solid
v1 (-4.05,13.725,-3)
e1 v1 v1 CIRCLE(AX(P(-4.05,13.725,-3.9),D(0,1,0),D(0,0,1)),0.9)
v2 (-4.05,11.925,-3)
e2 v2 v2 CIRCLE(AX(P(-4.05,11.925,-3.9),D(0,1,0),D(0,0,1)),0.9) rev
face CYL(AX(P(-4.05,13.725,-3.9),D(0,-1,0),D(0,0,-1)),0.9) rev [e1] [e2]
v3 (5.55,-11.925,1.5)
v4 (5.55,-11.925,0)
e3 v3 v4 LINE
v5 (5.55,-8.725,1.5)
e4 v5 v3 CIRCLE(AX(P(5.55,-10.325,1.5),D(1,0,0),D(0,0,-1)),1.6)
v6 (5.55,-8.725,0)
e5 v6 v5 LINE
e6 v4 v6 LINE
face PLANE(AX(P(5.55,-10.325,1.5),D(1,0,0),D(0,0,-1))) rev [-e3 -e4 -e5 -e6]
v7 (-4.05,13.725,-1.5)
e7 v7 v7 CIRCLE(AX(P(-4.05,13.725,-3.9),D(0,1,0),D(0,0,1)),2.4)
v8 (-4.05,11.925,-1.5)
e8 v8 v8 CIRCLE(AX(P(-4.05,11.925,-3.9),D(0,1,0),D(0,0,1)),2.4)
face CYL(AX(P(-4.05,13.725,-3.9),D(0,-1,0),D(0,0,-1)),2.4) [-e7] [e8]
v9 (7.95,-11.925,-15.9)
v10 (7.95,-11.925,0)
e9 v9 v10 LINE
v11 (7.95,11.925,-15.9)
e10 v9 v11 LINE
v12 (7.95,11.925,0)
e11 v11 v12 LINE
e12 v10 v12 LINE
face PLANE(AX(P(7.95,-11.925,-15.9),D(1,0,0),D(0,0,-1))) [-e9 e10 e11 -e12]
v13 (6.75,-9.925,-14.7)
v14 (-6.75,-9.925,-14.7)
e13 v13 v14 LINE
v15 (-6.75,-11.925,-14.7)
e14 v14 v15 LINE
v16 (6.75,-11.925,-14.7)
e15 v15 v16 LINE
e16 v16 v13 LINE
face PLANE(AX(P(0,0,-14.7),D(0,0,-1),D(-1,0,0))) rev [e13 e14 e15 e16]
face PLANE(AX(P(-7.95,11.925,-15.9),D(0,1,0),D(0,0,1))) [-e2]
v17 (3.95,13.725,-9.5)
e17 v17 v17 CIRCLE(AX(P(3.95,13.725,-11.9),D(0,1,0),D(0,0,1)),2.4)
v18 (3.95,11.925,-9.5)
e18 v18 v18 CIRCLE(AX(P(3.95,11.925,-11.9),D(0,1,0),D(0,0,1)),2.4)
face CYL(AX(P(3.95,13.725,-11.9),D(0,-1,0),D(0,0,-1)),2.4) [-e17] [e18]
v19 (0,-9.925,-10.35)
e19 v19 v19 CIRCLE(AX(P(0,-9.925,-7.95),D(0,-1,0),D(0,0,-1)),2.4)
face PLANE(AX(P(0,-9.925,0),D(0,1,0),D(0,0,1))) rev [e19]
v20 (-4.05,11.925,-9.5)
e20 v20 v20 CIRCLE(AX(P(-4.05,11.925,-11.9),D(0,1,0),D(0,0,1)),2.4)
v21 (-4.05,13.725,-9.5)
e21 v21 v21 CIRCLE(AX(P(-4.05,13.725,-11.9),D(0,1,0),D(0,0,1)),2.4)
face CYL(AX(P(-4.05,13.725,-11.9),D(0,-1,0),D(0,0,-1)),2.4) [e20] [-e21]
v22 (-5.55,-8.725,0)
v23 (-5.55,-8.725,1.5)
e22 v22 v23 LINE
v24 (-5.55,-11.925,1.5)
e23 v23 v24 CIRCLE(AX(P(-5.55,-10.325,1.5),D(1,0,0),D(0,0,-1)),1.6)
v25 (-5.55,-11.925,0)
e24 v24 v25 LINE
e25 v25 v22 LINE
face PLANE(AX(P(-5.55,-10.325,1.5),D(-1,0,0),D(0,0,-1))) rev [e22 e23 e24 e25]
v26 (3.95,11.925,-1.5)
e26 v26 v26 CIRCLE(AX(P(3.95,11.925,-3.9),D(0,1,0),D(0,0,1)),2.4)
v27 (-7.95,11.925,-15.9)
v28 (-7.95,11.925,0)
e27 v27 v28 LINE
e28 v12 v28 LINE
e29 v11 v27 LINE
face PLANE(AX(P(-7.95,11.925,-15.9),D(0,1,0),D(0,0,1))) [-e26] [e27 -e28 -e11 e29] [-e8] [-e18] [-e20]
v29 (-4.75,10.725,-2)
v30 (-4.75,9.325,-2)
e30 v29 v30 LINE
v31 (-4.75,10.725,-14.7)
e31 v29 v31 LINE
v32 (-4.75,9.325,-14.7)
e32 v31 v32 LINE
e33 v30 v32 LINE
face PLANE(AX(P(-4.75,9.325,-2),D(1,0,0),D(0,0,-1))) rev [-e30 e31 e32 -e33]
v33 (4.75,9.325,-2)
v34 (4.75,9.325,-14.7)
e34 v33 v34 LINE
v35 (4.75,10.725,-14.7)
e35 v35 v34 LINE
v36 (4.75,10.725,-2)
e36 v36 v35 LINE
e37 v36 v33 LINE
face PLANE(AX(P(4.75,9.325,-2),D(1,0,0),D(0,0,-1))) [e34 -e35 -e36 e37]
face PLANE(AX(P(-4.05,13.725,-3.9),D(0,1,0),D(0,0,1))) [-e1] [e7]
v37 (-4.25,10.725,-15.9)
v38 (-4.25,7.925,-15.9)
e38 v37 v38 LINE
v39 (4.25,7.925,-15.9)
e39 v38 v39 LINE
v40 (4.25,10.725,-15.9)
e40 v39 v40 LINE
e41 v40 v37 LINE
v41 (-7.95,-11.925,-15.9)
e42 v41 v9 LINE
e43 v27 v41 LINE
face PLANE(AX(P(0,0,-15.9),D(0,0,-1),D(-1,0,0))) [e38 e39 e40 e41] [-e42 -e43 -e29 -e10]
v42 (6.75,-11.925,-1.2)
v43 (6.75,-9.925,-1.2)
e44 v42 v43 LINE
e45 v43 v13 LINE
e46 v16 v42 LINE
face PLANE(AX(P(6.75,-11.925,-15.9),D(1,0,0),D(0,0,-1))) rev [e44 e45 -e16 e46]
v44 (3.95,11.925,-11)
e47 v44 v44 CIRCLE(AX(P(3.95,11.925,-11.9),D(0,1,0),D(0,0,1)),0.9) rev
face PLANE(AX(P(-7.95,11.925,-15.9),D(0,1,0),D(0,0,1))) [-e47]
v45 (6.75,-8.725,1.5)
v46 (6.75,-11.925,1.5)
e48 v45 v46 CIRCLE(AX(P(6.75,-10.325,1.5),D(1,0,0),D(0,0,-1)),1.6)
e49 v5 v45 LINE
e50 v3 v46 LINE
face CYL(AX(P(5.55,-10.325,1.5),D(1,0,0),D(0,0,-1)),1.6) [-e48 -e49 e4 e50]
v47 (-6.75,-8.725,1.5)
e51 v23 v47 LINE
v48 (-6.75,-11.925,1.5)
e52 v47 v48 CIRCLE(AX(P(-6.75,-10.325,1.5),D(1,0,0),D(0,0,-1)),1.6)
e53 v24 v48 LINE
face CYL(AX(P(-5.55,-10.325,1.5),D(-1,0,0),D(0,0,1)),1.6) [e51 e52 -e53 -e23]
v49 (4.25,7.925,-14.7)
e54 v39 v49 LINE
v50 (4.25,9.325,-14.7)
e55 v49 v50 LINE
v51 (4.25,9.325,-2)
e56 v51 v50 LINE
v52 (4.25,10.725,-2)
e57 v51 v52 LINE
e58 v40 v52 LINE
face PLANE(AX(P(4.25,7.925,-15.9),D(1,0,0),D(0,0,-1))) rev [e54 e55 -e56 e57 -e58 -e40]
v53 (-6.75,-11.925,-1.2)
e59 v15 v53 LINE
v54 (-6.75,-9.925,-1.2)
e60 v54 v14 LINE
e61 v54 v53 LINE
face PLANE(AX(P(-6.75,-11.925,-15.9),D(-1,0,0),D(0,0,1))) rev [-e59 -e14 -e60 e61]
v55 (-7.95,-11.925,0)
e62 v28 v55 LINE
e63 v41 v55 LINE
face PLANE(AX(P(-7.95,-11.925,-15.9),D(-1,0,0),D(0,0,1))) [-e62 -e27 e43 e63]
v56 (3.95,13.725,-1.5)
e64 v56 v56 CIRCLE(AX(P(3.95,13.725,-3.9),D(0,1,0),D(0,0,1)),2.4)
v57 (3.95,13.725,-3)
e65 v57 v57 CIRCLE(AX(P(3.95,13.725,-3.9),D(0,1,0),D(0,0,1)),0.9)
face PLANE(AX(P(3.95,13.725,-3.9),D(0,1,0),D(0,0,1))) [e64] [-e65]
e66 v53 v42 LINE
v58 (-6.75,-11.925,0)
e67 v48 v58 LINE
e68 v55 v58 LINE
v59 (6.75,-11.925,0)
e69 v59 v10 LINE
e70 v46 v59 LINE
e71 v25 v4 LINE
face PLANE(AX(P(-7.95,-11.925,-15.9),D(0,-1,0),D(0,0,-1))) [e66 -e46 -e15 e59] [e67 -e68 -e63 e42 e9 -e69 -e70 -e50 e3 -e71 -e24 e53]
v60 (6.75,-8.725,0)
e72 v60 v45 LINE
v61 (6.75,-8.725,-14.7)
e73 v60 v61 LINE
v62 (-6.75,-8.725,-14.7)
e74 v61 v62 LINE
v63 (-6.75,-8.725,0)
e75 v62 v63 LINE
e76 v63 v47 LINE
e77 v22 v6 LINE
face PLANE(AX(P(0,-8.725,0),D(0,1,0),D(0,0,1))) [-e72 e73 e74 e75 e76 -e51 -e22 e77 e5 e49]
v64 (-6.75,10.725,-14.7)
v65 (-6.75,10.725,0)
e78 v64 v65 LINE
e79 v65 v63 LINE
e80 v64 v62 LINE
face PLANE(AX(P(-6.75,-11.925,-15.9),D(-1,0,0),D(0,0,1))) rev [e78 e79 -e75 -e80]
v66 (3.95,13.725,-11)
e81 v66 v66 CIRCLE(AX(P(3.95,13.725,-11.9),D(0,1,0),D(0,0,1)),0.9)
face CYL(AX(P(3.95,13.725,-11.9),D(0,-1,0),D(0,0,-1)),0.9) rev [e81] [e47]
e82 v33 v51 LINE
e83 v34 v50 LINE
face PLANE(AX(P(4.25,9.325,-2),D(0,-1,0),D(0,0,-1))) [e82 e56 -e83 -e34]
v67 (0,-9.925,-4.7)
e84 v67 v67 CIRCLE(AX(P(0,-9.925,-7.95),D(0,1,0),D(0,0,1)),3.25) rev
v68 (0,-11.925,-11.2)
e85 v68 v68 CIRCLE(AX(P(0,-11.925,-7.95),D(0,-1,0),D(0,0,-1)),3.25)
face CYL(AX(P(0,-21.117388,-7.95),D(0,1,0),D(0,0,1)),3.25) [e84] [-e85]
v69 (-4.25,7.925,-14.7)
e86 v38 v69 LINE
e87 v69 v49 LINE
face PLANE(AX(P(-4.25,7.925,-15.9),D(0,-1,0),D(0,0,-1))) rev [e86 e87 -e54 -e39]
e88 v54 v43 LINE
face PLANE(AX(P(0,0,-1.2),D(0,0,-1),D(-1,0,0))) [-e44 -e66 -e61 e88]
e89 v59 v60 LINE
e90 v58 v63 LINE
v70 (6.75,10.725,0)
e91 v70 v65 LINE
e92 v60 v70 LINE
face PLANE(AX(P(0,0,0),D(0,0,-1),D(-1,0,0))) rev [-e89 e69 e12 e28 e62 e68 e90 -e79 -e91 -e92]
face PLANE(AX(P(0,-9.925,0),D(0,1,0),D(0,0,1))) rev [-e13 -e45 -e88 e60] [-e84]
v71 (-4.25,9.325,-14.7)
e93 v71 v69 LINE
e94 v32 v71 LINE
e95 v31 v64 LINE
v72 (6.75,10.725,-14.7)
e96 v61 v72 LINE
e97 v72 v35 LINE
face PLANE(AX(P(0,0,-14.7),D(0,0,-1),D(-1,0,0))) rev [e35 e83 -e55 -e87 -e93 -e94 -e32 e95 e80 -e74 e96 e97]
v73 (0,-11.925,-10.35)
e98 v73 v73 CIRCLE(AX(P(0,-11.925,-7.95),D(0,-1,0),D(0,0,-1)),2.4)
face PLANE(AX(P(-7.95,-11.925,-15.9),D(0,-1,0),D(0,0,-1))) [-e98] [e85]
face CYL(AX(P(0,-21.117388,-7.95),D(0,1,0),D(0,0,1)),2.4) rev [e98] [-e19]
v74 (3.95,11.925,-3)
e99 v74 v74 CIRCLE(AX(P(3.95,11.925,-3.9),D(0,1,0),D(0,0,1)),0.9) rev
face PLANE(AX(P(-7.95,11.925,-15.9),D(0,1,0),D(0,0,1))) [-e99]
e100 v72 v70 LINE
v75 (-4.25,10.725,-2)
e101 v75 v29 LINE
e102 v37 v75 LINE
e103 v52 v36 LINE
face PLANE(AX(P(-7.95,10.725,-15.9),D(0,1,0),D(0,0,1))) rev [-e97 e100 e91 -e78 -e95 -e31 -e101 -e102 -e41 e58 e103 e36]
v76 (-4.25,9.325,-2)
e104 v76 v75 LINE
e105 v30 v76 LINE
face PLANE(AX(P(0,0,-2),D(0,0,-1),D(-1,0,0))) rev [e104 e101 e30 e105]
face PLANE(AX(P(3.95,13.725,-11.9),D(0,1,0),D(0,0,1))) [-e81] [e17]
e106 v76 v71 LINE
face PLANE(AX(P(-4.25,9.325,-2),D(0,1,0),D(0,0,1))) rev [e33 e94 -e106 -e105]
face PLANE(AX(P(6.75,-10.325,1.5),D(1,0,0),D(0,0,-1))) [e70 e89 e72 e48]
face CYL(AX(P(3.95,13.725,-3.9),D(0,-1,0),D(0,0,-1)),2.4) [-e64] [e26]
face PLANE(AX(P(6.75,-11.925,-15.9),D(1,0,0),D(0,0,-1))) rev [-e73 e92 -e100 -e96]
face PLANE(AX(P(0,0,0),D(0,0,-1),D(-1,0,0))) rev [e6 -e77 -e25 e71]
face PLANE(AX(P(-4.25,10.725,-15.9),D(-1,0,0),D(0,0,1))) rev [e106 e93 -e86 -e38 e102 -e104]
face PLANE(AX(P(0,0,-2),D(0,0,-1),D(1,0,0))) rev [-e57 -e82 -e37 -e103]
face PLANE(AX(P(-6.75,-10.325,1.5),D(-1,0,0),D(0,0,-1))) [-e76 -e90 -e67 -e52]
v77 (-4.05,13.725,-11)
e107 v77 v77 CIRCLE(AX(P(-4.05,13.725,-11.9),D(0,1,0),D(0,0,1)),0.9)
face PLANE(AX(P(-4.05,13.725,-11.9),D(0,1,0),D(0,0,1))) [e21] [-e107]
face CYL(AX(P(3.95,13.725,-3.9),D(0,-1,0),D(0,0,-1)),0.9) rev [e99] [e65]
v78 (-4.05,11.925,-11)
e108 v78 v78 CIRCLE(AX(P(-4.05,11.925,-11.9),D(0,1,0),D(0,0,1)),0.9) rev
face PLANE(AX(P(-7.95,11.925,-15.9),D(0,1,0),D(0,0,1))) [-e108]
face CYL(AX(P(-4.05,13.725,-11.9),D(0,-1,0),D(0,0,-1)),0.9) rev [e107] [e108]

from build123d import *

# Parameters (mm, degrees)
SKETCH1_W            = 15.9
SKETCH1_H            = 23.85
BOSS_EXTRUDE1_DEPTH  = 15.9
SHELL2_T             = -1.2
SKETCH7_W            = 13.5
SKETCH7_H            = 14.7
BOSS_EXTRUDE4_DEPTH  = 2
SHELL3_START         = -6.75
SHELL3_OUTLINE_W     = 2
SHELL3_OUTLINE_H     = 13.5
SHELL3_DEPTH         = 13.5
BOSS_EXTRUDE3_DEPTH  = 1.2
SKETCH8_W            = 8.5
SKETCH8_H            = 2.8
CUT_EXTRUDE2_DEPTH   = 23.852748741
SKETCH9_W            = 0.5
SKETCH9_H            = 1.4
BOSS_EXTRUDE5_DEPTH  = 12.7
SKETCH10_R           = 3.25
SKETCH10_R_2         = 2.4
BOSS_EXTRUDE6_DEPTH  = 2
SKETCH11_R           = 2.4
SKETCH11_R_2         = 0.9
BOSS_EXTRUDE7_DEPTH  = 1.8
LPATTERN1_COUNT      = 2
LPATTERN1_PITCH      = 8
LPATTERN1_COUNT_DIR2 = 2
LPATTERN1_PITCH_DIR2 = 8


# Read off the part's stored shape, not the designer's step: Shell3
with BuildPart() as part:
    # Sketch1 → Boss-Extrude1 (new body)
    with BuildSketch(Plane.XY):
        Rectangle(SKETCH1_W, SKETCH1_H)
    extrude(amount=-BOSS_EXTRUDE1_DEPTH)

    # Shell2
    shell2_openings = [part.faces().sort_by_distance(p)[0] for p in [
        (0, 0, 0),
    ]]
    offset(amount=SHELL2_T, openings=shell2_openings, kind=Kind.INTERSECTION)

    # Sketch7 → Boss-Extrude4 (add)
    with BuildSketch(Plane(origin=(0, -10.725, 0), x_dir=(1, 0, 0), z_dir=(0, 1, 0))):
        with Locations((0, 7.35)):
            Rectangle(SKETCH7_W, SKETCH7_H)
    extrude(amount=BOSS_EXTRUDE4_DEPTH)

    # Shell3 outline → Shell3 (cut)
    with BuildSketch(Plane.YZ.offset(SHELL3_START)):
        with Locations((-10.925, -7.95)):
            Rectangle(SHELL3_OUTLINE_W, SHELL3_OUTLINE_H)
    extrude(amount=SHELL3_DEPTH, mode=Mode.SUBTRACT)

    # Sketch5 → Boss-Extrude3 (add)
    with BuildSketch(Plane(origin=(6.75, 0, 0), x_dir=(0, 0, -1), z_dir=(1, 0, 0))):
        with BuildLine():
            Line((0, -11.925), (-1.5, -11.925))
            ThreePointArc((-1.5, -11.925), (-3.1, -10.325), (-1.5, -8.725))
            Line((-1.5, -8.725), (0, -8.725))
            Line((0, -8.725), (0, -11.925))
        make_face()
    boss_extrude3 = extrude(amount=-BOSS_EXTRUDE3_DEPTH)

    # Mirror2: Boss-Extrude3 across plane
    add(boss_extrude3.mirror(Plane(origin=(0, 0, 0), x_dir=(0, 0, 1), z_dir=(1, 0, 0))))

    # Sketch8 → Cut-Extrude2 (cut, through all)
    with BuildSketch(Plane.XY.offset(-14.7)):
        with Locations((0, 9.325)):
            Rectangle(SKETCH8_W, SKETCH8_H)
    extrude(amount=-CUT_EXTRUDE2_DEPTH, mode=Mode.SUBTRACT)

    # Sketch9 → Boss-Extrude5 (add)
    with BuildSketch(Plane.XY.offset(-14.7)):
        with Locations((-4.5, 10.025)):
            Rectangle(SKETCH9_W, SKETCH9_H)
    boss_extrude5 = extrude(amount=BOSS_EXTRUDE5_DEPTH)

    # Mirror3: Boss-Extrude5 across plane
    add(boss_extrude5.mirror(Plane(origin=(0, 0, 0), x_dir=(0, 0, 1), z_dir=(1, 0, 0))))

    # Sketch10 → Boss-Extrude6 (add)
    with BuildSketch(Plane.XZ.offset(9.925)):
        with Locations(Location((0, -7.95, 0), (0, 0, 90))):
            Circle(SKETCH10_R)
        with Locations(Location((0, -7.95, 0), (0, 0, 270))):
            Circle(SKETCH10_R_2, mode=Mode.SUBTRACT)
    extrude(amount=BOSS_EXTRUDE6_DEPTH)

    # Sketch11 → Boss-Extrude7 (add)
    with BuildSketch(Plane(origin=(0, 11.925, 0), x_dir=(1, 0, 0), z_dir=(0, 1, 0))):
        with Locations(Location((-4.05, 3.9, 0), (0, 0, 270))):
            Circle(SKETCH11_R)
        with Locations(Location((-4.05, 3.9, 0), (0, 0, 270))):
            Circle(SKETCH11_R_2, mode=Mode.SUBTRACT)
    boss_extrude7 = extrude(amount=BOSS_EXTRUDE7_DEPTH)

    # LPattern1: Boss-Extrude7 2 × 2
    with Locations(*[(i * LPATTERN1_PITCH, 0, -j * LPATTERN1_PITCH_DIR2) for i in range(LPATTERN1_COUNT) for j in range(LPATTERN1_COUNT_DIR2) if (i, j) != (0, 0)]):
        add(boss_extrude7)


solid = part.part
